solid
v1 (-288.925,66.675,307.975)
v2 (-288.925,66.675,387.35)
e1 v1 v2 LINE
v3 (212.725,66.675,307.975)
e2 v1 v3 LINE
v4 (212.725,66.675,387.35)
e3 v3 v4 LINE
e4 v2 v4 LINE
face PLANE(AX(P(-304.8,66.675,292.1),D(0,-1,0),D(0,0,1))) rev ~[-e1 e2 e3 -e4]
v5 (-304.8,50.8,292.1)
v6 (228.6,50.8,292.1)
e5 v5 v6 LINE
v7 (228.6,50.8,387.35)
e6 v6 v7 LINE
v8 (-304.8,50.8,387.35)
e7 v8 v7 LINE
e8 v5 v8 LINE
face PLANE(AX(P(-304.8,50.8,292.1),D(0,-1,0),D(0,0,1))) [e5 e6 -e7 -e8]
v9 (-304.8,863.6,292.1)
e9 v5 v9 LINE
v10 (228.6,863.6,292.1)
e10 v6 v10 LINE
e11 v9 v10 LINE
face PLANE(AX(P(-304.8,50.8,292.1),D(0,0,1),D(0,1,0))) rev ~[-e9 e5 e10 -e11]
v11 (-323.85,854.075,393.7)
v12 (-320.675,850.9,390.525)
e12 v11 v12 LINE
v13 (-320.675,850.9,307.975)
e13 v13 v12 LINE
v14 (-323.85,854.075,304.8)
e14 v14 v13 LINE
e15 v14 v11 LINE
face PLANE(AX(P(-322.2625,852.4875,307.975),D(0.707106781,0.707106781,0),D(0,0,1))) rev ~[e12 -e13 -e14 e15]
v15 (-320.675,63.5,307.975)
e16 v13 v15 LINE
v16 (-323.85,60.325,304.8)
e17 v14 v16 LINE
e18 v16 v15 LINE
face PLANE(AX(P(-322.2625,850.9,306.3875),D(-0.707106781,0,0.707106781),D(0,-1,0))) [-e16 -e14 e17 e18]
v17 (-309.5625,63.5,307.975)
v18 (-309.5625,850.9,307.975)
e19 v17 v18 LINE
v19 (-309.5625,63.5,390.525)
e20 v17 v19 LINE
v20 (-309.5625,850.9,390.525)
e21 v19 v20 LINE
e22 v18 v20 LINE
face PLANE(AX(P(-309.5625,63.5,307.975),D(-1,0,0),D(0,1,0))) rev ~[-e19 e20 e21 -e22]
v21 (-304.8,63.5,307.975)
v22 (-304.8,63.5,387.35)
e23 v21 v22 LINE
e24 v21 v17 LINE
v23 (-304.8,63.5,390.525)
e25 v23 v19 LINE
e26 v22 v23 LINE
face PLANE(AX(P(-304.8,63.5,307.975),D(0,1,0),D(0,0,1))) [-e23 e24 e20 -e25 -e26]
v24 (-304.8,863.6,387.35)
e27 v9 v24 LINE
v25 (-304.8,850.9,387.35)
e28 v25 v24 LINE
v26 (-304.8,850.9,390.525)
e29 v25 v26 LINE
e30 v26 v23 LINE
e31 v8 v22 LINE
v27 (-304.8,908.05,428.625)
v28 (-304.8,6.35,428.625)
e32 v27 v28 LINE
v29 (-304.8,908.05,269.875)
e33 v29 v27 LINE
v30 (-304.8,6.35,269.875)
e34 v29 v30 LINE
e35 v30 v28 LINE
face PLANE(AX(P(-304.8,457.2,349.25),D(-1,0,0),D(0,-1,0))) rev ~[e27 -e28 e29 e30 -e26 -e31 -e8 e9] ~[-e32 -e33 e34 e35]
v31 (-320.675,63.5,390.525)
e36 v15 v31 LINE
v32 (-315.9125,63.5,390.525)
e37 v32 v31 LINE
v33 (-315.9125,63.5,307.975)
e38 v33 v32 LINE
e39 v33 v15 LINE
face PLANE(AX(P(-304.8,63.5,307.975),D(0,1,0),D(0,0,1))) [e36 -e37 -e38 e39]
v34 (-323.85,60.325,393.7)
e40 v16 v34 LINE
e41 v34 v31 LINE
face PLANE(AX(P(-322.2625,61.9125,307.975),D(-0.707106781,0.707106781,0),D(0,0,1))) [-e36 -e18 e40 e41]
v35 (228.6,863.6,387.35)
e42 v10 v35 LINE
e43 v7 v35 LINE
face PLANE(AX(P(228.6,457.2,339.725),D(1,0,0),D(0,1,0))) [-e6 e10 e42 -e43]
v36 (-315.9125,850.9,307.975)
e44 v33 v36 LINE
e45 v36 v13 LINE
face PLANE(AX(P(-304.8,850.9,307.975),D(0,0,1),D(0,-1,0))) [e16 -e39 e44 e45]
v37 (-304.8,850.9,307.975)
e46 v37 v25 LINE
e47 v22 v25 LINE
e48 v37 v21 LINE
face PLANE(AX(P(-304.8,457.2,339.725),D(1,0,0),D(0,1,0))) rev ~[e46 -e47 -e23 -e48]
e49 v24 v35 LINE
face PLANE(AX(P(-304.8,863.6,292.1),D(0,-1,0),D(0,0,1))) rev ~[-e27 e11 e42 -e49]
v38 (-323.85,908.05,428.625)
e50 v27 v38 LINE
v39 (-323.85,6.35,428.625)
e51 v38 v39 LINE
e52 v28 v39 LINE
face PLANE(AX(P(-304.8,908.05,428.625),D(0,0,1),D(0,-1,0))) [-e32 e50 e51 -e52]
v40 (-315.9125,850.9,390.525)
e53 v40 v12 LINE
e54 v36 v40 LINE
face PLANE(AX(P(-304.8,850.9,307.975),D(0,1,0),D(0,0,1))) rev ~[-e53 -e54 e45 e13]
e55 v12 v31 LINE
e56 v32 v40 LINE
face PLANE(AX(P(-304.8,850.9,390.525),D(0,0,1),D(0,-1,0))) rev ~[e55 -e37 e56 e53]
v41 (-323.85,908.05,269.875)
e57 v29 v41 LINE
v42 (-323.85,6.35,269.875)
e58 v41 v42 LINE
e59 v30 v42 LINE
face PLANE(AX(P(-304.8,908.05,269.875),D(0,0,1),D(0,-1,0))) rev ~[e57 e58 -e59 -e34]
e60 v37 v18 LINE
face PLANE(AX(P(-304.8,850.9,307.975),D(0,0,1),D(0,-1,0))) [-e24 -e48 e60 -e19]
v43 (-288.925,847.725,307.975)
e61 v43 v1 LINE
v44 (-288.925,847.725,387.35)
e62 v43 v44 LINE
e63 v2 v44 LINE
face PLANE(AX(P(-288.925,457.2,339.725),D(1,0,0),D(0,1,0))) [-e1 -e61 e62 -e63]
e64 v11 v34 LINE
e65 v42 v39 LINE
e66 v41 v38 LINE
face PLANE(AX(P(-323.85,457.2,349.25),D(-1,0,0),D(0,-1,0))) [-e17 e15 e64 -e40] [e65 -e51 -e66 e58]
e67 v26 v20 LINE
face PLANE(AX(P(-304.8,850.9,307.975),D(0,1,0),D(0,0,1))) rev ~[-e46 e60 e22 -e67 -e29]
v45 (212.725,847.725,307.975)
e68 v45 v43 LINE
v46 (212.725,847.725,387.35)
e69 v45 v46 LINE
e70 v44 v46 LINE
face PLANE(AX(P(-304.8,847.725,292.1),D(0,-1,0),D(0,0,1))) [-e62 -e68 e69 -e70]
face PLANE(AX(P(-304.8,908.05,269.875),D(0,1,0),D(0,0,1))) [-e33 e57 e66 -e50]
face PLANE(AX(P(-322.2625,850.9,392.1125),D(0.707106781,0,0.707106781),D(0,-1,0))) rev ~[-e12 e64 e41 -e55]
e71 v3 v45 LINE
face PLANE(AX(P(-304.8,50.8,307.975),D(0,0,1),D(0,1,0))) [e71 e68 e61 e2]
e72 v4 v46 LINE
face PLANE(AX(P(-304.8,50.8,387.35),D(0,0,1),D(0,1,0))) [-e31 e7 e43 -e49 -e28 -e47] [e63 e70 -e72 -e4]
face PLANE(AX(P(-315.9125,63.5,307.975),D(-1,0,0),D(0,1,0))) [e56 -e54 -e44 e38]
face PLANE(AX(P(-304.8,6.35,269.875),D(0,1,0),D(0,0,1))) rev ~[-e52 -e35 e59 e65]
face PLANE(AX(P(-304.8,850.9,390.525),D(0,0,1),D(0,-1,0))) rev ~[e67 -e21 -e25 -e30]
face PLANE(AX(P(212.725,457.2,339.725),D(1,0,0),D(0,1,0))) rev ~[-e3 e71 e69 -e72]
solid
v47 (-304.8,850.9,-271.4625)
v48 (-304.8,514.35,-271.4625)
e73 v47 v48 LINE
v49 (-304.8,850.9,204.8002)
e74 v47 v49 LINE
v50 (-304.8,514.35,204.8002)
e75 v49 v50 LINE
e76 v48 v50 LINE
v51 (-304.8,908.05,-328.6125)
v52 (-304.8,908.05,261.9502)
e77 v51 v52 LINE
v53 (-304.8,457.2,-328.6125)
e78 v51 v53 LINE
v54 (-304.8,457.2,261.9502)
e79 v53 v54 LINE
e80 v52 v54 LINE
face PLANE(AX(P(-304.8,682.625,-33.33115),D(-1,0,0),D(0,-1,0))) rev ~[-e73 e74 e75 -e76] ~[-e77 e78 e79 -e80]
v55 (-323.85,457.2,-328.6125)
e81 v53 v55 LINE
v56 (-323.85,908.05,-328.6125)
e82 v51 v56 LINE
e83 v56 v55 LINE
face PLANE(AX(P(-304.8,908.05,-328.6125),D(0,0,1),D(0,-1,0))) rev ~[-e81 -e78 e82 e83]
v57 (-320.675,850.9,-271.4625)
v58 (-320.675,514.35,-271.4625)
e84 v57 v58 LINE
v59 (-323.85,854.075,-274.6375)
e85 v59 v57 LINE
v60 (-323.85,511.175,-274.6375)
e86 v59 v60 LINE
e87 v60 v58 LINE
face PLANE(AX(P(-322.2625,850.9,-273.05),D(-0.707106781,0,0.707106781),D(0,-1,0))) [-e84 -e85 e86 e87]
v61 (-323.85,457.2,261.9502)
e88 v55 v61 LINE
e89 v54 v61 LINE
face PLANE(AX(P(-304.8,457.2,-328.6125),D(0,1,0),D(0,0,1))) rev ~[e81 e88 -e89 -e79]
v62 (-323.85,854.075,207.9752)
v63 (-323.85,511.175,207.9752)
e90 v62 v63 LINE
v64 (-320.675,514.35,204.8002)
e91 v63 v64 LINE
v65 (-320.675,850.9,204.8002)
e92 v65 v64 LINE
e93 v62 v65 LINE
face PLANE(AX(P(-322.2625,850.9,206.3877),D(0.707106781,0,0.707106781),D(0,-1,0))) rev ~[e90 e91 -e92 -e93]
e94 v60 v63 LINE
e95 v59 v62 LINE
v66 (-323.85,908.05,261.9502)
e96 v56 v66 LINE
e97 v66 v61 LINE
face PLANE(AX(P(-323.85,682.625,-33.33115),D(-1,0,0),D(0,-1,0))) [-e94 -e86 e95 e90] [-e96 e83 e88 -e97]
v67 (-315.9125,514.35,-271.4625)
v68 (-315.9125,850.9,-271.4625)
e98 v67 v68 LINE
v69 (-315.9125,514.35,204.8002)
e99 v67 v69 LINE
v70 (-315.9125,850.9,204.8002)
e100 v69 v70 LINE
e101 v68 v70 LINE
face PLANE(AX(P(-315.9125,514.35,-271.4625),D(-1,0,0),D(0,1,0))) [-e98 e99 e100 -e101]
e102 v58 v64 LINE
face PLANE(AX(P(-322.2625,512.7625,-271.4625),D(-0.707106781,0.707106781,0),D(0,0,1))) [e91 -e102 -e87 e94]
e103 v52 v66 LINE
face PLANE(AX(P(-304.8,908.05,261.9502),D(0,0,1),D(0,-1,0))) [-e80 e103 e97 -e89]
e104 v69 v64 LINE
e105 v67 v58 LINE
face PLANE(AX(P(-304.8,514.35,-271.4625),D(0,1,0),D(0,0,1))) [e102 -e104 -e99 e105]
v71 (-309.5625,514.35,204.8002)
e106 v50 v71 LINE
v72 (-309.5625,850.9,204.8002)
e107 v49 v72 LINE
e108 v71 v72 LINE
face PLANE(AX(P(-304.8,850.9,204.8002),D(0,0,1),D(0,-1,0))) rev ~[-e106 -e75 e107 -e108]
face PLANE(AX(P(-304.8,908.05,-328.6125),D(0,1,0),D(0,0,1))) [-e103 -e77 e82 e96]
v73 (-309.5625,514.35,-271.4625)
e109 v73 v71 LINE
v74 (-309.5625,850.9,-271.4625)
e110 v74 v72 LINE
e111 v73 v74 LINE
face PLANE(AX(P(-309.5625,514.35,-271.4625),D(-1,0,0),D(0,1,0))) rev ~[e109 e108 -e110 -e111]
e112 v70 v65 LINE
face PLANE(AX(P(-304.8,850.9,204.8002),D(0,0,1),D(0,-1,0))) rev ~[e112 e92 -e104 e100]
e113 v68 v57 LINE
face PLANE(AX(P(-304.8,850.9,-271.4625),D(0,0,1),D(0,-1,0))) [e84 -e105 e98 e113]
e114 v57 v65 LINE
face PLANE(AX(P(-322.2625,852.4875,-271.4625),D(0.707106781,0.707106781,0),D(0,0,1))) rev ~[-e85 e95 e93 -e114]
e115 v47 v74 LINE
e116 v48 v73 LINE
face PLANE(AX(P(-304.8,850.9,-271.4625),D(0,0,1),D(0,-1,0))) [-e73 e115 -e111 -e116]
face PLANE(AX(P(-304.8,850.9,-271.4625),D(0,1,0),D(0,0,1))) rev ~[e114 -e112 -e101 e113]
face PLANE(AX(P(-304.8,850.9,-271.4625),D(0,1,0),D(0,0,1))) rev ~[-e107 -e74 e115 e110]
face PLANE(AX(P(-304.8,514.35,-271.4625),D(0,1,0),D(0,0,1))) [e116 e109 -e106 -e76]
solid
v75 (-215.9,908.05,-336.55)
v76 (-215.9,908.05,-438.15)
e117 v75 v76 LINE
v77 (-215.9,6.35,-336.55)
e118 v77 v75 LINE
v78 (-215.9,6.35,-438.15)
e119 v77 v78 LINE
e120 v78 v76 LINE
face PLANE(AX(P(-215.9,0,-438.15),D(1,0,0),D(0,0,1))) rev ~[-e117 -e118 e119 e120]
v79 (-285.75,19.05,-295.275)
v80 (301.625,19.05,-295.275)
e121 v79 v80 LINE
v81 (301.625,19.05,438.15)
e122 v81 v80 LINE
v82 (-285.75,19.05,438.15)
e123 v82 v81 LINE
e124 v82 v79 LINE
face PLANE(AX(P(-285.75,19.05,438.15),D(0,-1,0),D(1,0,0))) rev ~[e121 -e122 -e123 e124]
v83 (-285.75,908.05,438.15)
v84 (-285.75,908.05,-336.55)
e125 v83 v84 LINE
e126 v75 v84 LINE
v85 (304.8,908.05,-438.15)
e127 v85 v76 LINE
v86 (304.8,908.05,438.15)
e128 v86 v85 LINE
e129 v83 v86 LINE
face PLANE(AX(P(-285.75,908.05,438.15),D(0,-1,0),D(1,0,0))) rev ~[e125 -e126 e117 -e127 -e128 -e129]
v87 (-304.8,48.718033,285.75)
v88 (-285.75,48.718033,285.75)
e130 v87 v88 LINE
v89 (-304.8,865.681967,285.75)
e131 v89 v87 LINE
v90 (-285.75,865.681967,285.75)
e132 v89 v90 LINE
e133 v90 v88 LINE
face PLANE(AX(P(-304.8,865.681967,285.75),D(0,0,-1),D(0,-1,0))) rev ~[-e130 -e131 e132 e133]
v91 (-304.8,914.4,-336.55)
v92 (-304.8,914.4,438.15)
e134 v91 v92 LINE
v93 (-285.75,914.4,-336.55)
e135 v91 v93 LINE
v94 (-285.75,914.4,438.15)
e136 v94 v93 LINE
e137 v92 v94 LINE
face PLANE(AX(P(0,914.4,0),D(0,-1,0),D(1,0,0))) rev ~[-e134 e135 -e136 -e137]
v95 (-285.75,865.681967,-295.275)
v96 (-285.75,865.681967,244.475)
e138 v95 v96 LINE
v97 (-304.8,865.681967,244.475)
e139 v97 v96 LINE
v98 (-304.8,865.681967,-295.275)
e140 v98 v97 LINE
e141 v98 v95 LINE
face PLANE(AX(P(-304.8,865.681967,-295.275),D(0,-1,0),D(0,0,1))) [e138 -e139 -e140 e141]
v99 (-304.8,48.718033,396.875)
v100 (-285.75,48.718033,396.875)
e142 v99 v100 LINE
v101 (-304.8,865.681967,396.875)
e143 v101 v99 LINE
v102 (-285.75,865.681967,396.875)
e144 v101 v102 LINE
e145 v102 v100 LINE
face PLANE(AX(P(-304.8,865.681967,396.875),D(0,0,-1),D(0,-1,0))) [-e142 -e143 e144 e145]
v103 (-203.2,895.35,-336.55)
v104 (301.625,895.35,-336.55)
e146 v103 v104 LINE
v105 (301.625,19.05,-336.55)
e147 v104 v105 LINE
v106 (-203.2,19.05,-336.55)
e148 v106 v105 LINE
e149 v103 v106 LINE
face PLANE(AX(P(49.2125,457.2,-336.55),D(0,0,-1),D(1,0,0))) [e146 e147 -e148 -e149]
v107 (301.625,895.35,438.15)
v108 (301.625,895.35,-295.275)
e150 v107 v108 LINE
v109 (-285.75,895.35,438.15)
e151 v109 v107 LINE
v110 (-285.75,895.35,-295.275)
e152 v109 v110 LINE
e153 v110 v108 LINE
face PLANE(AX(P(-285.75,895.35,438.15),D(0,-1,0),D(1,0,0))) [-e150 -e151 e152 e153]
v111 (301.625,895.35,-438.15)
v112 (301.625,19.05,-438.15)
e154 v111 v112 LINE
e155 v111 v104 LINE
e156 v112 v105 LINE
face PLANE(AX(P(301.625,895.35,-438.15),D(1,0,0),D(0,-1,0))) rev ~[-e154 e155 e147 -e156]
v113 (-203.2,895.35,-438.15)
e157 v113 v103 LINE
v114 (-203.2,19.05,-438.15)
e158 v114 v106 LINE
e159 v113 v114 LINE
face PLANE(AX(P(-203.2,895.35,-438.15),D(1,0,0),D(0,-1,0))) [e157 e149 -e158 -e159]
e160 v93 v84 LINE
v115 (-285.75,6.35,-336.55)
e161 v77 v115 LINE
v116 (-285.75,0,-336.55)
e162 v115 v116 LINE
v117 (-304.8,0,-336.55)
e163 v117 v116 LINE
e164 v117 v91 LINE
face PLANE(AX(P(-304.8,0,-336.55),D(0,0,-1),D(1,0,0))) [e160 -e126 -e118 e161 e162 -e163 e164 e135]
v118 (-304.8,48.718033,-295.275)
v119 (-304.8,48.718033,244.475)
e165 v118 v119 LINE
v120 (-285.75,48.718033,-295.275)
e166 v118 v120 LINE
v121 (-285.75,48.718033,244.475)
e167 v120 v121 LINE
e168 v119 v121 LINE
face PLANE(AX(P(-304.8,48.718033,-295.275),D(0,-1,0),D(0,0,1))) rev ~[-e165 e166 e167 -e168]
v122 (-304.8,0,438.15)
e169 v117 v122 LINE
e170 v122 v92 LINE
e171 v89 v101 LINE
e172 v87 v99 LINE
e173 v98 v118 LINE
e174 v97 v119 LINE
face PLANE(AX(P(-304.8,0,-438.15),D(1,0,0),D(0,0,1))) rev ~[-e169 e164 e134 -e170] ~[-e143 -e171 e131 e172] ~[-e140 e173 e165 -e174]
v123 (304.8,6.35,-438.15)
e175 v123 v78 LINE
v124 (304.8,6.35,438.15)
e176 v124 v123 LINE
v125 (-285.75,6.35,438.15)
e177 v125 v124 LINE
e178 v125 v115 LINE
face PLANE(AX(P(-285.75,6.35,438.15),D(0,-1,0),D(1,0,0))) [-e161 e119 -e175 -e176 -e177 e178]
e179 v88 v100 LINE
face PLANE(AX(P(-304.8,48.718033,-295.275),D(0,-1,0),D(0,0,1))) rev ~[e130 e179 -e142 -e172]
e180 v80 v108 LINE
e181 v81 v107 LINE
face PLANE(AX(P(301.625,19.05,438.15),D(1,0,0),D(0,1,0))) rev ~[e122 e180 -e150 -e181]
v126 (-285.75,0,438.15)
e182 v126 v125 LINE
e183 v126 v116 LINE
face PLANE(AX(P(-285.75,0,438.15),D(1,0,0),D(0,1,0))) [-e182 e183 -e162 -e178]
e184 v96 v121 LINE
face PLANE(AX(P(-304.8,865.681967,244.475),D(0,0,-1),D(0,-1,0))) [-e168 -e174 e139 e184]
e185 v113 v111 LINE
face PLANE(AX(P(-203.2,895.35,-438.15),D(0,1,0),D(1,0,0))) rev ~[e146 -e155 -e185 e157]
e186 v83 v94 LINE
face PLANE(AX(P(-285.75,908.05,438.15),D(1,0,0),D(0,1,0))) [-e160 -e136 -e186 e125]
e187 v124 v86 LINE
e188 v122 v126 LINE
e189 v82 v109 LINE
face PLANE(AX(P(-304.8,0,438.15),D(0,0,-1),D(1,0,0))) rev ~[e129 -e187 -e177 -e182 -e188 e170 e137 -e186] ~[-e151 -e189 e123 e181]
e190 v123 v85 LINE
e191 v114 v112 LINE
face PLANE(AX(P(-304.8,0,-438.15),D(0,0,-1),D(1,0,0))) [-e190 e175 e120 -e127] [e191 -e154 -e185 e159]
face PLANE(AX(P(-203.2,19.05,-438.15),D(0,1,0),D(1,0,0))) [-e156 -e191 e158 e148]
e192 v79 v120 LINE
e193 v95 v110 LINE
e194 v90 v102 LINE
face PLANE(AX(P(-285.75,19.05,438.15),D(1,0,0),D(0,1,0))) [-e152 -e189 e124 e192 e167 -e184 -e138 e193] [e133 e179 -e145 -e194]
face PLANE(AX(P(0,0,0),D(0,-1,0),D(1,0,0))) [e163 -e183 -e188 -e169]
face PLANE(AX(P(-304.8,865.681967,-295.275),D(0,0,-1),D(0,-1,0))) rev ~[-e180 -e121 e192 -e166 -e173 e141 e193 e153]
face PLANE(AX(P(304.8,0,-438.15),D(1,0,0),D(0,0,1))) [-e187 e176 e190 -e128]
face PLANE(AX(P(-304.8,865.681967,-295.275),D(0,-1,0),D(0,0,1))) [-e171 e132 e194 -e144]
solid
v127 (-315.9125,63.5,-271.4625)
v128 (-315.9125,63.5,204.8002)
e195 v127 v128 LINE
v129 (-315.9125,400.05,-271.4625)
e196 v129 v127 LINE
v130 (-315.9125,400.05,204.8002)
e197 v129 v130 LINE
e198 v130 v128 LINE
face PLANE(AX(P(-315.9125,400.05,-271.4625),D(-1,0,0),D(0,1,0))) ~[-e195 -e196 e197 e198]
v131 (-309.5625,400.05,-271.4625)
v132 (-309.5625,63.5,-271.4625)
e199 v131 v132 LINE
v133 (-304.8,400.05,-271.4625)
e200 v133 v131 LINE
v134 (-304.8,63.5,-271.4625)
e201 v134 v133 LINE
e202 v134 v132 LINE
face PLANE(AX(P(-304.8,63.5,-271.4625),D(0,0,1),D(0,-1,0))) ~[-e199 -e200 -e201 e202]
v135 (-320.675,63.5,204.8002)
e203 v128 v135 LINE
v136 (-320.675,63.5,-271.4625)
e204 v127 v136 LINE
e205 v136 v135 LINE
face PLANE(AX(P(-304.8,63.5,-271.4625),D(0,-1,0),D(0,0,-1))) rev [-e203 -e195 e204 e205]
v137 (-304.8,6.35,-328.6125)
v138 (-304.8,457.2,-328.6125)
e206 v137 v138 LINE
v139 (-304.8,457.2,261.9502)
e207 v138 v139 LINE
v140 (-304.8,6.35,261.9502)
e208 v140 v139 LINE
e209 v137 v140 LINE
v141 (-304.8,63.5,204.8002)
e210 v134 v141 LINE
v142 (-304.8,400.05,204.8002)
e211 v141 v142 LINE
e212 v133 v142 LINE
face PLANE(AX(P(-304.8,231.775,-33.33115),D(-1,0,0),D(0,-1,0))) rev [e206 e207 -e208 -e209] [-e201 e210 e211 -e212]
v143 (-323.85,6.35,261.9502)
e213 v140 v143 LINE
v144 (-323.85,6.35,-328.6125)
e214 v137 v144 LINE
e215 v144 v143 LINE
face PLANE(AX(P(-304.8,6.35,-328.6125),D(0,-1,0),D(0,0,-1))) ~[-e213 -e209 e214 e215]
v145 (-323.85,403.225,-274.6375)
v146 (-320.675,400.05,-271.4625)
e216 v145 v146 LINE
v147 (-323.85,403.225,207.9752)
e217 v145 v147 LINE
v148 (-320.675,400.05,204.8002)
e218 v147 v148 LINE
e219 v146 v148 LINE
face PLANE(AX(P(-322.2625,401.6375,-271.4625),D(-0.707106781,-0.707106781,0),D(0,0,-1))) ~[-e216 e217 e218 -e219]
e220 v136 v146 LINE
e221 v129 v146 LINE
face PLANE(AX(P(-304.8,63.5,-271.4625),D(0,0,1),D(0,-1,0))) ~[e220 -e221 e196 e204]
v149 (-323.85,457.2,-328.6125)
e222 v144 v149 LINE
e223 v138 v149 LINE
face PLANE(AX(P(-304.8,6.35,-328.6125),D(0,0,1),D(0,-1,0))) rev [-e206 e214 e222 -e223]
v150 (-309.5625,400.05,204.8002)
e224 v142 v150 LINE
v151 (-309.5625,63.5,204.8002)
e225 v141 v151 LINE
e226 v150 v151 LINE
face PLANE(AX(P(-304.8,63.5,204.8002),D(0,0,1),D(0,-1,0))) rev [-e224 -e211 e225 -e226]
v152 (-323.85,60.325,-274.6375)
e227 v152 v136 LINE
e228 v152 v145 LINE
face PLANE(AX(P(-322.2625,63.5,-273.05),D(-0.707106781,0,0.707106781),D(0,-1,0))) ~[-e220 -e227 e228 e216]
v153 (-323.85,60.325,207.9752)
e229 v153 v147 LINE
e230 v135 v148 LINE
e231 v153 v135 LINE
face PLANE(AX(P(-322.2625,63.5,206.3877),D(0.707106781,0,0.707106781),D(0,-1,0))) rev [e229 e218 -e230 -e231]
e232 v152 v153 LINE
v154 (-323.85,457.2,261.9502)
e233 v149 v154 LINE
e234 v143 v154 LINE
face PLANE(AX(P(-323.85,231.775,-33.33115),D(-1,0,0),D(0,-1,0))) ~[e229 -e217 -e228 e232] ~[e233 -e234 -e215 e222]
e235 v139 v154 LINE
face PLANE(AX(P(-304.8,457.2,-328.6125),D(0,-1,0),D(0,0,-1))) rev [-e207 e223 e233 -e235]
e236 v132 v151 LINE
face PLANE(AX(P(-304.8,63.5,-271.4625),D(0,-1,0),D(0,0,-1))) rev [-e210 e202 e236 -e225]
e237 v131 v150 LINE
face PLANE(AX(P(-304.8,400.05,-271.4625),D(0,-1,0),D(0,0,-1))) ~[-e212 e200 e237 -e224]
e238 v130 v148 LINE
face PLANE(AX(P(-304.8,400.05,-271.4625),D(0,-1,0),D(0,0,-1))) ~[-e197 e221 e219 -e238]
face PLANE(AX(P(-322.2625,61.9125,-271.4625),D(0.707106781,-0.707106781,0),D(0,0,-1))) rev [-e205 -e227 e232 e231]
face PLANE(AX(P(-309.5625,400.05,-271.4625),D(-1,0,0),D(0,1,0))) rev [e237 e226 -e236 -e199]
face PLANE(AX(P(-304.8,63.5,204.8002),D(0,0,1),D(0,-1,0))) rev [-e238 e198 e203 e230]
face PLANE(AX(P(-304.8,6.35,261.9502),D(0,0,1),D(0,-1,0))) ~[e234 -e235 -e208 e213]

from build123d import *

# Parameters (mm, degrees)
F0_W          = 609.6
F0_H          = 876.3
F1_DEPTH      = 914.4
F2_W          = 88.9
F2_H          = 101.6
F3_DEPTH      = 914.401
F4_W          = 816.9639344262
F4_H          = 692.15
F5_DEPTH      = 19.05
F6_W          = 590.55
F6_H          = 6.35
F7_DEPTH      = 876.301
F8_W          = 587.375
F8_H          = 876.3
F9_DEPTH      = 733.425
F10_W         = 816.9639344262
F10_H         = 41.275
F11_DEPTH     = 19.05
F12_W         = 450.85
F12_H         = 590.5627
F12_W_2       = 336.55
F12_H_2       = 476.2627
F13_DEPTH     = 19.05
F14_W         = 6.35
F14_H         = 336.55
F15_DEPTH     = 476.2627
F16_SIZE      = 3.175
F17_W         = 901.7
F17_H         = 158.75
F17_W_2       = 787.4
F17_H_2       = 82.55
F18_DEPTH     = 19.05
F19_W         = 6.35
F19_H         = 787.4
F20_DEPTH     = 82.55
F21_SIZE      = 3.175
F22_W         = 504.825
F22_H         = 876.3
F23_DEPTH     = 101.6
F24_W         = 812.8
F24_H         = 95.25
F25_DEPTH     = 533.4
F26_T         = 15.875
F26_T3_DEPTH  = 37.249261314
F26_T5_DEPTH  = 37.249261314
F26_T7_DEPTH  = 37.249261314
F26_T9_DEPTH  = 37.249261314
F26_T11_DEPTH = 36.5125
F26_T13_DEPTH = 819.15
F26_T15_DEPTH = 114.3
F26_T17_DEPTH = 127
F26_T19_DEPTH = 844.55
F26_T21_DEPTH = 111.125
F26_T23_DEPTH = 36.5125


# Not quite as in the source:
# - a shell that OpenCascade refuses in one call is made with other operations: the cavity is built on its own and cut out


with BuildPart() as f1:
    # F0 (on Front) → F1 (new body)
    with BuildSketch(Plane.XZ):
        Rectangle(F0_W, F0_H)
    extrude(amount=-F1_DEPTH)

    # F2 (on face) → F3 (cut, through all)
    with BuildSketch(Plane.XZ):
        with Locations((-260.35, -387.35)):
            Rectangle(F2_W, F2_H)
    extrude(amount=-F3_DEPTH, mode=Mode.SUBTRACT)

    # F4 (on face) → F5 (cut)
    with BuildSketch(Plane(origin=(-304.8, 0, 0), x_dir=(0, -1, 0), z_dir=(-1, 0, 0))):
        with Locations((-457.2, 50.8)):
            Rectangle(F4_W, F4_H)
    extrude(amount=-F5_DEPTH, mode=Mode.SUBTRACT)

    # F6 (on face) → F7 (cut, through all)
    with BuildSketch(Plane.XY.offset(438.15)):
        with Locations((9.525, 911.225)):
            Rectangle(F6_W, F6_H)
        with Locations((9.525, 3.175)):
            Rectangle(F6_W, F6_H)
    extrude(amount=-F7_DEPTH, mode=Mode.SUBTRACT)

    # F8 (on face) → F9 (cut, through all)
    with BuildSketch(Plane.XY.offset(438.15)):
        with Locations((7.9375, 457.2)):
            Rectangle(F8_W, F8_H)
    extrude(amount=-F9_DEPTH, mode=Mode.SUBTRACT)

    # F10 (on face) → F11 (join, through all)
    with BuildSketch(Plane(origin=(-304.8, 0, 0), x_dir=(0, -1, 0), z_dir=(-1, 0, 0))):
        with Locations((-457.2, 265.1125)):
            Rectangle(F10_W, F10_H)
    extrude(amount=-F11_DEPTH)

    # F22 (on face) → F23 (cut)
    with BuildSketch(Plane(origin=(0, 0, -438.15), x_dir=(1, 0, 0), z_dir=(0, 0, -1))):
        with Locations((49.2125, -457.2)):
            Rectangle(F22_W, F22_H)
    extrude(amount=-F23_DEPTH, mode=Mode.SUBTRACT)


with BuildPart() as f13:
    # F12 (on face) → F13 (new body)
    with BuildSketch(Plane(origin=(-304.8, 0, 0), x_dir=(0, -1, 0), z_dir=(-1, 0, 0))):
        with Locations((-682.625, -33.33115)):
            Rectangle(F12_W, F12_H)
        with Locations((-682.625, -33.33115)):
            Rectangle(F12_W_2, F12_H_2, mode=Mode.SUBTRACT)
    extrude(amount=F13_DEPTH)

    # F14 (on face) → F15 (join, through all)
    with BuildSketch(Plane.XY.offset(-271.4625)):
        with Locations((-312.7375, 682.625)):
            Rectangle(F14_W, F14_H)
    extrude(amount=F15_DEPTH)

    # F16
    f16_edges = [f13.edges().sort_by_distance(p)[0] for p in [
        (-323.85, 850.9, -33.33115),
        (-323.85, 682.625, -271.4625),
        (-323.85, 514.35, -33.33115),
        (-323.85, 682.625, 204.8002),
    ]]
    chamfer(f16_edges, length=F16_SIZE)


with BuildPart() as f18:
    # F17 (on face) → F18 (new body)
    with BuildSketch(Plane(origin=(-304.8, 0, 0), x_dir=(0, -1, 0), z_dir=(-1, 0, 0))):
        with Locations((-457.2, 349.25)):
            Rectangle(F17_W, F17_H)
        with Locations((-457.2, 349.25)):
            Rectangle(F17_W_2, F17_H_2, mode=Mode.SUBTRACT)
    extrude(amount=F18_DEPTH)

    # F19 (on face) → F20 (join, through all)
    with BuildSketch(Plane.XY.offset(307.975)):
        with Locations((-312.7375, 457.2)):
            Rectangle(F19_W, F19_H)
    extrude(amount=F20_DEPTH)

    # F21
    f21_edges = [f18.edges().sort_by_distance(p)[0] for p in [
        (-323.85, 457.2, 307.975),
        (-323.85, 850.9, 349.25),
        (-323.85, 457.2, 390.525),
        (-323.85, 63.5, 349.25),
    ]]
    chamfer(f21_edges, length=F21_SIZE)

    # F24 (on face) → F25 (join)
    with BuildSketch(Plane.YZ.offset(-304.8)):
        with Locations((457.2, 339.725)):
            Rectangle(F24_W, F24_H)
    extrude(amount=F25_DEPTH)

    # F26: shell of thickness 15.875, made by hand


with BuildPart() as f26_core1:
    # F26_t2: copy of F18
    add(f18.part)

    # the walls: a layer under each face that stays
    f26_faces = [f26_core1.faces().sort_by_distance(p)[0] for p in [
        (-323.85, 757.7666666667, 296.3333333333),
        (-322.2625, 457.2, 306.3875),
        (-322.2625, 61.9125, 349.25),
        (-322.2625, 852.4875, 349.25),
        (-322.2625, 457.2, 392.1125),
        (-314.325, 457.2, 428.625),
        (-314.325, 908.05, 349.25),
        (-314.325, 457.2, 269.875),
        (-314.325, 6.35, 349.25),
        (-318.29375, 457.2, 307.975),
        (-318.29375, 63.5, 349.25),
        (-318.29375, 850.9, 349.25),
        (-318.29375, 457.2, 390.525),
        (-304.8, 757.7666666667, 402.1666666667),
        (-315.9125, 457.2, 349.25),
        (-38.1, 863.6, 339.725),
        (-38.1, 457.2, 292.1),
        (-38.1, 50.8, 339.725),
        (-307.18125, 63.5, 349.25),
        (-307.18125, 457.2, 390.525),
        (-307.18125, 850.9, 349.25),
        (-304.8, 457.2, 347.6625),
        (228.6, 457.2, 339.725),
        (-307.18125, 457.2, 307.975),
        (-309.5625, 457.2, 349.25),
    ]]
    thicken(f26_faces, amount=-F26_T, mode=Mode.SUBTRACT)

    # F26_s4 → F26_t3 (cut)
    with BuildSketch(Plane(origin=(4.5928978099, 4.5928978099, 4.5928978099), x_dir=(-0.7071067812, 0.7071067812, 0), z_dir=(0.5773502692, 0.5773502692, 0.5773502692))):
        Polygon((271.8908726623, 356.5892701441), (263.7152476623, 342.7036353262), (255.7777476623, 347.2863530879), (255.7777476623, 356.4517886113), align=None)
    extrude(amount=F26_T3_DEPTH, mode=Mode.SUBTRACT)

    # F26_s6 → F26_t5 (cut)
    with BuildSketch(Plane(origin=(-300.2071021901, 300.20710219, -300.2071021901), x_dir=(0.7071067812, 0.7071067812, 0), z_dir=(0.5773502692, -0.5773502692, 0.5773502692))):
        Polygon((374.6875680546, 729.8915069443), (382.8631930546, 716.0058721263), (390.8006930546, 720.588589888), (390.8006930546, 729.7540254114), align=None)
    extrude(amount=F26_T5_DEPTH, mode=Mode.SUBTRACT)

    # F26_s8 → F26_t7 (cut)
    with BuildSketch(Plane(origin=(-228.2404355234, -228.2404355234, 228.2404355234), x_dir=(-0.7071067812, 0.7071067812, 0), z_dir=(0.5773502692, 0.5773502692, -0.5773502692))):
        Polygon((271.8908726623, 213.7335916339), (255.7777476623, 213.8710731668), (255.7777476623, 223.0365086901), (263.7152476623, 227.6192264518), align=None)
    extrude(amount=F26_T7_DEPTH, mode=Mode.SUBTRACT)

    # F26_s10 → F26_t9 (cut)
    with BuildSketch(Plane(origin=(-533.0404355234, 533.0404355234, 533.0404355234), x_dir=(0.7071067812, 0.7071067812, 0), z_dir=(0.5773502692, -0.5773502692, -0.5773502692))):
        Polygon((374.6875680546, -159.5686451663), (390.8006930546, -159.4311636334), (390.8006930546, -150.26572811), (382.8631930546, -145.6830103483), align=None)
    extrude(amount=F26_T9_DEPTH, mode=Mode.SUBTRACT)

    # F26_s12 → F26_t11 (cut)
    with BuildSketch(Plane.YZ.offset(-336.55)):
        Polygon((850.74125, 308.13375), (850.9, 292.1), (866.775, 292.1), (866.775, 307.975), align=None)
        Polygon((63.65875, 308.13375), (63.5, 292.1), (47.625, 292.1), (47.625, 307.975), align=None)
        Polygon((63.65875, 390.36625), (47.625, 390.525), (47.625, 406.4), (63.5, 406.4), align=None)
        Polygon((850.74125, 390.36625), (866.775, 390.525), (866.775, 406.4), (850.9, 406.4), align=None)
    extrude(amount=F26_T11_DEPTH, mode=Mode.SUBTRACT)

    # F26_s14 → F26_t13 (cut)
    with BuildSketch(Plane.XZ.offset(-866.775)):
        Polygon((-316.07125, 308.13375), (-315.9125, 292.1), (-300.0375, 292.1), (-300.0375, 307.975), align=None)
        Polygon((-316.07125, 390.36625), (-315.9125, 406.4), (-300.0375, 406.4), (-300.0375, 390.525), align=None)
        Polygon((-309.40375, 390.36625), (-309.5625, 406.4), (-325.4375, 406.4), (-325.4375, 390.525), align=None)
        Polygon((-304.95875, 308.13375), (-288.925, 307.975), (-288.925, 292.1), (-304.8, 292.1), align=None)
        Polygon((-309.40375, 308.13375), (-309.5625, 292.1), (-325.4375, 292.1), (-325.4375, 307.975), align=None)
    extrude(amount=F26_T13_DEPTH, mode=Mode.SUBTRACT)

    # F26_s16 → F26_t15 (cut)
    with BuildSketch(Plane.XY.offset(292.1)):
        Polygon((-316.07125, 63.65875), (-315.9125, 47.625), (-300.0375, 47.625), (-300.0375, 63.5), align=None)
        Polygon((-316.07125, 850.74125), (-315.9125, 866.775), (-300.0375, 866.775), (-300.0375, 850.9), align=None)
        Polygon((-309.40375, 63.65875), (-309.5625, 47.625), (-325.4375, 47.625), (-325.4375, 63.5), align=None)
        Polygon((-309.40375, 850.74125), (-309.5625, 866.775), (-325.4375, 866.775), (-325.4375, 850.9), align=None)
    extrude(amount=F26_T15_DEPTH, mode=Mode.SUBTRACT)

    # F26_s18 → F26_t17 (cut)
    with BuildSketch(Plane.XY.offset(276.225)):
        Polygon((-304.64125, 863.75875), (-320.675, 863.6), (-320.675, 847.725), (-304.8, 847.725), align=None)
        Polygon((-304.64125, 50.64125), (-320.675, 50.8), (-320.675, 66.675), (-304.8, 66.675), align=None)
    extrude(amount=F26_T17_DEPTH, mode=Mode.SUBTRACT)

    # F26_s20 → F26_t19 (cut)
    with BuildSketch(Plane.XZ.offset(-879.475)):
        Polygon((-304.64125, 291.94125), (-320.675, 292.1), (-320.675, 307.975), (-304.8, 307.975), align=None)
    extrude(amount=F26_T19_DEPTH, mode=Mode.SUBTRACT)

    # F26_s22 → F26_t21 (cut)
    with BuildSketch(Plane.XY.offset(292.1)):
        Polygon((-304.95875, 63.65875), (-304.8, 47.625), (-288.925, 47.625), (-288.925, 63.5), align=None)
        Polygon((-304.95875, 850.74125), (-304.8, 866.775), (-288.925, 866.775), (-288.925, 850.9), align=None)
    extrude(amount=F26_T21_DEPTH, mode=Mode.SUBTRACT)

    # F26_s24 → F26_t23 (cut)
    with BuildSketch(Plane.YZ.offset(-325.4375)):
        Polygon((63.65875, 308.13375), (47.625, 307.975), (47.625, 292.1), (63.5, 292.1), align=None)
        Polygon((63.65875, 390.36625), (47.625, 390.525), (47.625, 406.4), (63.5, 406.4), align=None)
        Polygon((850.74125, 390.36625), (850.9, 406.4), (866.775, 406.4), (866.775, 390.525), align=None)
        Polygon((850.74125, 308.13375), (866.775, 307.975), (866.775, 292.1), (850.9, 292.1), align=None)
    extrude(amount=F26_T23_DEPTH, mode=Mode.SUBTRACT)


with BuildPart() as f18_1:
    add(f18.part)

    # what is left inside the walls is the cavity
    f26_cavity = [f26_core1.part.solids().sort_by_distance(p)[0] for p in [
        (45.508333, 457.2, 308.13375),
    ]]
    add(f26_cavity, mode=Mode.SUBTRACT)


with BuildPart() as f27_1:
    # F27: instance of F13
    add(f13.part.mirror(Plane(origin=(-314.325, 457.2, -33.33115), x_dir=(1, 0, 0), z_dir=(0, -1, 0))))


solid = Compound([f1.part, f13.part, f18_1.part, f27_1.part])
